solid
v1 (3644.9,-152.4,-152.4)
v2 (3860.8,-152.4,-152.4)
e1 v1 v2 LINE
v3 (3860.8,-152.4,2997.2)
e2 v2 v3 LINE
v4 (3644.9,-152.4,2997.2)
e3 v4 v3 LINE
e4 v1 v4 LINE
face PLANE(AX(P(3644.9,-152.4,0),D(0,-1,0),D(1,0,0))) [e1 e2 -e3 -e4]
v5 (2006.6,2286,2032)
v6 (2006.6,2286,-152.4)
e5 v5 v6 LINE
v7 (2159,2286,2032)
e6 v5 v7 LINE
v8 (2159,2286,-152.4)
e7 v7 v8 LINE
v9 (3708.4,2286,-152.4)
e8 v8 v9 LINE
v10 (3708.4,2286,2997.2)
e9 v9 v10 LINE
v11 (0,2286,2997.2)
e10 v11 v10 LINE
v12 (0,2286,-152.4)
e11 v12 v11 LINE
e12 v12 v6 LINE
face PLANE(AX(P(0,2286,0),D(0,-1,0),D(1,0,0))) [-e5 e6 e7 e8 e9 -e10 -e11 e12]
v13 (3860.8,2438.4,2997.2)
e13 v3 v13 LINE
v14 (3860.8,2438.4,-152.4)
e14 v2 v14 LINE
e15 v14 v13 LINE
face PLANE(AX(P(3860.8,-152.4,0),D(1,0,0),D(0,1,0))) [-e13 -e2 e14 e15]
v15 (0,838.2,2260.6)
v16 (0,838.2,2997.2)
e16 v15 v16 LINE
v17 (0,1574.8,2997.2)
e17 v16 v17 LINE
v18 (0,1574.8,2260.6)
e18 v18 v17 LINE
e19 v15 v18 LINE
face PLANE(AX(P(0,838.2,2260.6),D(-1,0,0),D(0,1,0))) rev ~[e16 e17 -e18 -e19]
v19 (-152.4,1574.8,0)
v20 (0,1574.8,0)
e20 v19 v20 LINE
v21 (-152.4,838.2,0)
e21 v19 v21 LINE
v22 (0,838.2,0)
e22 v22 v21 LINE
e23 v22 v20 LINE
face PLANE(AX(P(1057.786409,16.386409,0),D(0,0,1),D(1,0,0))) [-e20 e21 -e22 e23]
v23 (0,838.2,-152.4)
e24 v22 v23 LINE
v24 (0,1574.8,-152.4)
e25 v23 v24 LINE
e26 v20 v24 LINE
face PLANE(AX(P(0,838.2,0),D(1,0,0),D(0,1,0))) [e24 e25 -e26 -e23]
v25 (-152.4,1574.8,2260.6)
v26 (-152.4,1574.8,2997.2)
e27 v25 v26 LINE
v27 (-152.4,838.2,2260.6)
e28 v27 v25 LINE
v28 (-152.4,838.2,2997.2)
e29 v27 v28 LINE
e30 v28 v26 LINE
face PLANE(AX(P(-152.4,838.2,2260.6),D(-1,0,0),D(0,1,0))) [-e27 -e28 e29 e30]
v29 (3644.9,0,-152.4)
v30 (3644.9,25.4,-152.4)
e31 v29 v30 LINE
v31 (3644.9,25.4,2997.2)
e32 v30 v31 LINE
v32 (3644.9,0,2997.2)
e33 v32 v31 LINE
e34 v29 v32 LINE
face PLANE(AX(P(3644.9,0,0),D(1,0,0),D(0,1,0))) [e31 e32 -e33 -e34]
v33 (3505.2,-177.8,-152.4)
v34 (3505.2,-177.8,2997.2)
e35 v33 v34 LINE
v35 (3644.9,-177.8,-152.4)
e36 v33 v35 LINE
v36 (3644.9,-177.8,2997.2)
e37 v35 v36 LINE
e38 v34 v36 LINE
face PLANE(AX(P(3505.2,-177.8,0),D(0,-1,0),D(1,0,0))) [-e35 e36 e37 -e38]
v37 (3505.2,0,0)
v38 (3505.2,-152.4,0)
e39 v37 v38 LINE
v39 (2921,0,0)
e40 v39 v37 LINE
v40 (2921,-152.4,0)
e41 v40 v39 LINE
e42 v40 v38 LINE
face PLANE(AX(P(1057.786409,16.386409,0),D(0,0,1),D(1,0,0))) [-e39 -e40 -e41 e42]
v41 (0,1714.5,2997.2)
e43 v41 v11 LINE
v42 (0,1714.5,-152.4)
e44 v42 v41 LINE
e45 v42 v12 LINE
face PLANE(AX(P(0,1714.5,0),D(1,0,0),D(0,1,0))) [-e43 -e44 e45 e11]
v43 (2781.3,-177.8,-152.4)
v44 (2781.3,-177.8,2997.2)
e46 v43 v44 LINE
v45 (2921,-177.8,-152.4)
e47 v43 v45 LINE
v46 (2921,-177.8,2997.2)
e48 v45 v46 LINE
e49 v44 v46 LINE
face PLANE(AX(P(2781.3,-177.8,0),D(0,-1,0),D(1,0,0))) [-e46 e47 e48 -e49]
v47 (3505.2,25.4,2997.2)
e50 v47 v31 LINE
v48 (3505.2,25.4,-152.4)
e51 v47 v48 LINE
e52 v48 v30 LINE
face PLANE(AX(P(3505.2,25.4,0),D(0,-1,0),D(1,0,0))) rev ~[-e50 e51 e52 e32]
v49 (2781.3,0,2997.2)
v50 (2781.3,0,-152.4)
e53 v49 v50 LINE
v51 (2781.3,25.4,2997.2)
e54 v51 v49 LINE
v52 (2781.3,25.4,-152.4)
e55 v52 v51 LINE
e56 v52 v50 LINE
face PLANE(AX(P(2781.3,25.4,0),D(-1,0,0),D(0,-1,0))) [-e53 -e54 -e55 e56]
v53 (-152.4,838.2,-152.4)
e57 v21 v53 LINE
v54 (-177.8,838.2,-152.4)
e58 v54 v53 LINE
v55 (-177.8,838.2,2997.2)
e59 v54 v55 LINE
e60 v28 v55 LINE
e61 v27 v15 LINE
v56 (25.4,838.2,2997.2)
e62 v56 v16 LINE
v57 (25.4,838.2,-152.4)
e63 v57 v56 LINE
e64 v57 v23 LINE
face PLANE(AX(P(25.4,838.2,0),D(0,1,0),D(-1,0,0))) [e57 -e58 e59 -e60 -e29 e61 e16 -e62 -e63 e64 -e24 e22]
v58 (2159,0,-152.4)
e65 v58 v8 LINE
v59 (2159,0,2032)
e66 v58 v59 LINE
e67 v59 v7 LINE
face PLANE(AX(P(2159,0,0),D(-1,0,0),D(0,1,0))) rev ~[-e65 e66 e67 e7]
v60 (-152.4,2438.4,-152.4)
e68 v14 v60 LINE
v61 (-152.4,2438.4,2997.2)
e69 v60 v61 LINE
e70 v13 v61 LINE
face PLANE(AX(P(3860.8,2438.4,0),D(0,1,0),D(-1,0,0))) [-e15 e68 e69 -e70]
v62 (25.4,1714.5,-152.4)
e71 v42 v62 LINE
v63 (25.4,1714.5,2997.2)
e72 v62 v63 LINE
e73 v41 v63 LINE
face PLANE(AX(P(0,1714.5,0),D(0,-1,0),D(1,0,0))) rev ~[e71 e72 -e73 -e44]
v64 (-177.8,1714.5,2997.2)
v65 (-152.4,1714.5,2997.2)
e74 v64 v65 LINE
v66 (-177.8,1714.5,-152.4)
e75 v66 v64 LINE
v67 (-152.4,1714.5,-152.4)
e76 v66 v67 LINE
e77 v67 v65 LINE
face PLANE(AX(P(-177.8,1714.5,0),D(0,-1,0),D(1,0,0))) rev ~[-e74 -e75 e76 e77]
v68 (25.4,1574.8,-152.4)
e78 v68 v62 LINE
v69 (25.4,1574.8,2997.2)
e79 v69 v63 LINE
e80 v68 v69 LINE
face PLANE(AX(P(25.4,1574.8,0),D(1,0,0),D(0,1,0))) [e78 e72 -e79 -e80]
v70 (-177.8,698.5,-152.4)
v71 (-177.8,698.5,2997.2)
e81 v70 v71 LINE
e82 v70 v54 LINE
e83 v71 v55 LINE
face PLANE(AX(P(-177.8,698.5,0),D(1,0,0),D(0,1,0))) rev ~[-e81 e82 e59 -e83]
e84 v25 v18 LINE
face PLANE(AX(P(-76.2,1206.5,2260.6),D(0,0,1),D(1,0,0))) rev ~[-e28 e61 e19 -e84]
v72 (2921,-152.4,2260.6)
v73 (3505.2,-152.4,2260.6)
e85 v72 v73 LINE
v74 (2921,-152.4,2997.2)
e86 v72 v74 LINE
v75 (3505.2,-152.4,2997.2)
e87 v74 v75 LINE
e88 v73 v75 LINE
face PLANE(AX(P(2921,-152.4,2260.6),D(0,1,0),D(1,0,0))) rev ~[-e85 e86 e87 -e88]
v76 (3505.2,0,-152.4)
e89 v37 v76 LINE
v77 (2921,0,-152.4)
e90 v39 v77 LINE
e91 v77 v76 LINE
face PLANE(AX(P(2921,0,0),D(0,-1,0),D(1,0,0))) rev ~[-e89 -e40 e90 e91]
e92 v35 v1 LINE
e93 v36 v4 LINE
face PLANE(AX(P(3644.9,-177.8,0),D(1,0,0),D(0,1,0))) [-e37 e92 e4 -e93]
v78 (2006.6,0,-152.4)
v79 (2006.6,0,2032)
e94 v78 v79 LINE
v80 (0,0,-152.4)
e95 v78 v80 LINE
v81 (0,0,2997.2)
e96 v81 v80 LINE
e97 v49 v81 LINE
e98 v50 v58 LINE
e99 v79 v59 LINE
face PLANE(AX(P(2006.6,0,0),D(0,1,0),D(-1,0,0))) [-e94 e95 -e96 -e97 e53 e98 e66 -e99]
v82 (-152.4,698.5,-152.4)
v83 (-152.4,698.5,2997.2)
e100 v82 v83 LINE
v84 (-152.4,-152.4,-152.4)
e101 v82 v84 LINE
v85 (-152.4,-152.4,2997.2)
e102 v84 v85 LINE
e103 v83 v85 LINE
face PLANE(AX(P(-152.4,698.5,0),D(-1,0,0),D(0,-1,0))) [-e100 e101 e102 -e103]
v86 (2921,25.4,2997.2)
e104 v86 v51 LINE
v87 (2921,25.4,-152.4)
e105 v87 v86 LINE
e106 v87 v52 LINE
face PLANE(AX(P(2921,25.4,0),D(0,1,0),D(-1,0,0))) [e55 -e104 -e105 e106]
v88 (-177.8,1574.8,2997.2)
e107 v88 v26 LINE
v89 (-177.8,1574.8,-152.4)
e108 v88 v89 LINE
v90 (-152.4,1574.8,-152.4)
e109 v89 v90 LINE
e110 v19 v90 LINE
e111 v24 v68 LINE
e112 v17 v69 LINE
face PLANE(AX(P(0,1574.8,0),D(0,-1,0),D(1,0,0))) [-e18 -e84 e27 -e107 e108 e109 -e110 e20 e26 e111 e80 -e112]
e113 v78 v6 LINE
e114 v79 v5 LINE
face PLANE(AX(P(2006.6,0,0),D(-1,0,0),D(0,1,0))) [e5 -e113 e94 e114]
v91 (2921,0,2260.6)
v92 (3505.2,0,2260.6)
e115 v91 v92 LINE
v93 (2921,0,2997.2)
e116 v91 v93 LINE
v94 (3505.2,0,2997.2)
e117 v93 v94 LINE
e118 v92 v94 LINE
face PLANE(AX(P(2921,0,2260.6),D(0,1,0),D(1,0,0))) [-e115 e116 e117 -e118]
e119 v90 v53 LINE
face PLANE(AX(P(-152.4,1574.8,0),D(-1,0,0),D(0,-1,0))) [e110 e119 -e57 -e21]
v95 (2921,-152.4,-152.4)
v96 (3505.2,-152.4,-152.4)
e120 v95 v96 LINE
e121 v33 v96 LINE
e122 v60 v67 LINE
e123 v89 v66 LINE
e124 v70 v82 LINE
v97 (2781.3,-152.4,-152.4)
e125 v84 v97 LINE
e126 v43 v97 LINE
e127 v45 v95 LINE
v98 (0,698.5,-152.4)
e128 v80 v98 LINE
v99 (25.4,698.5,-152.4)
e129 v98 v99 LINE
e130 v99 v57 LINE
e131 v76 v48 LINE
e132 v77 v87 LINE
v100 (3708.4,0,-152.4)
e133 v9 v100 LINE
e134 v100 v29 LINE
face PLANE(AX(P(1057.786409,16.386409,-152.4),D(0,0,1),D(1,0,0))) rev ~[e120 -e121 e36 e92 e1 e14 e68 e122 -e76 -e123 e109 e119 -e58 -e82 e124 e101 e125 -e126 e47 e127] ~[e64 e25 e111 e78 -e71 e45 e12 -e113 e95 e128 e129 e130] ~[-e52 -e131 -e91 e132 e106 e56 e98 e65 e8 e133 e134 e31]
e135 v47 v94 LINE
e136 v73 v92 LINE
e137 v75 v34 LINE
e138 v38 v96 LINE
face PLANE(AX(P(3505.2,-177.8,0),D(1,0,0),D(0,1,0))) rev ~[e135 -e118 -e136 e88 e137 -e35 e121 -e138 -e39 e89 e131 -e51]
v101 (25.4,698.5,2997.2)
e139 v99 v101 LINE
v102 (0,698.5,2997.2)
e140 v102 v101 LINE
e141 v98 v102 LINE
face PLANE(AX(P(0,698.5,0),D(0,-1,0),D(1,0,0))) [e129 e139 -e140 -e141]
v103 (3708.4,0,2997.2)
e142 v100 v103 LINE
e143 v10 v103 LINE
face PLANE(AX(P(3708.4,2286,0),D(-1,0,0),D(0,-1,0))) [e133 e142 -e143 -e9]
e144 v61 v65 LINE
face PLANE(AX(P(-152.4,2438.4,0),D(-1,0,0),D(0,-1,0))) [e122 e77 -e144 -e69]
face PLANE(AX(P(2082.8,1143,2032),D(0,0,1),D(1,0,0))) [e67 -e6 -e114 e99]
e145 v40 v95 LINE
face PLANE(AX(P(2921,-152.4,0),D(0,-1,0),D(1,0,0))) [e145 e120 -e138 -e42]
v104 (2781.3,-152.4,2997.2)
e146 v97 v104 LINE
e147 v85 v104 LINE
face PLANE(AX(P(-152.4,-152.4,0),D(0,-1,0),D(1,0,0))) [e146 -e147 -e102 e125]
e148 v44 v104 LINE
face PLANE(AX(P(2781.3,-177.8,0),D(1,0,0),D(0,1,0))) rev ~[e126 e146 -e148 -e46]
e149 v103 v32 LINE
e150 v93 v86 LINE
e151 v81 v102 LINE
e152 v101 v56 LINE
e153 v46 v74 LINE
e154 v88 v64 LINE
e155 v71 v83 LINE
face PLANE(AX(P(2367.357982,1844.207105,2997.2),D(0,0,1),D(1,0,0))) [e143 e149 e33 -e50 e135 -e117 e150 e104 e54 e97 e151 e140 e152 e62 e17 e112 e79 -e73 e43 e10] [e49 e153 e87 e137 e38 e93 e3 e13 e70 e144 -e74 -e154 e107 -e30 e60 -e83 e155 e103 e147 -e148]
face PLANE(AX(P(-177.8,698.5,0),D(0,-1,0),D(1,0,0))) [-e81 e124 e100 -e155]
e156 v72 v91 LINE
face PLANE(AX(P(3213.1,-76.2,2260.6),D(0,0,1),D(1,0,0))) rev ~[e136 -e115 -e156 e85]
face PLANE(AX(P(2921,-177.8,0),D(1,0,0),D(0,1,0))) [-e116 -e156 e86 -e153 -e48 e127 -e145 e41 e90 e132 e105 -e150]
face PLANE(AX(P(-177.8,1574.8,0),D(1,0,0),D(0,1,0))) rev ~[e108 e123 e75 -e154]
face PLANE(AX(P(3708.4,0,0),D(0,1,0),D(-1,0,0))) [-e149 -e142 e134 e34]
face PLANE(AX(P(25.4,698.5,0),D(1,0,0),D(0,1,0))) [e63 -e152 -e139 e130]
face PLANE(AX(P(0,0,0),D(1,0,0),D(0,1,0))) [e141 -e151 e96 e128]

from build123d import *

# Parameters (mm, degrees)
F0_W     = 152.4
F0_H     = 139.7
F0_W_2   = 25.4
F0_W_3   = 139.7
F0_H_2   = 152.4
F0_H_3   = 25.4
F1_DEPTH = 2997.2
F2_START = 2260.6
F0_H_4   = 736.6
F0_W_4   = 584.2
F2_DEPTH = 736.6
F0_H_5   = 2286
F3_DEPTH = 152.4
F4_DEPTH = 2032


with BuildPart() as f1:
    # F0 (on Top) → F1 (new body)
    with BuildSketch(Plane.XY):
        Polygon((2006.6, 0), (0, 0), (0, 698.5), (-152.4, 698.5), (-152.4, -152.4), (2781.3, -152.4), (2781.3, 0), (2159, 0), align=None)
        with Locations((-76.2, 768.35)):
            Rectangle(F0_W, F0_H)
        with Locations((12.7, 768.35)):
            Rectangle(F0_W_2, F0_H)
        with Locations((-165.1, 768.35)):
            Rectangle(F0_W_2, F0_H)
        Polygon((2781.3, 25.4), (2781.3, 0), (2921, 0), (2921, 25.4), (2844.8, 25.4), align=None)
        with Locations((2851.15, -76.2)):
            Rectangle(F0_W_3, F0_H_2)
        with Locations((2851.15, -165.1)):
            Rectangle(F0_W_3, F0_H_3)
    extrude(amount=F1_DEPTH)



with BuildPart() as f1b:
    # F0 (on Top) → F1, piece 2 (new body)
    with BuildSketch(Plane.XY):
        Polygon((0, 2286), (2006.6, 2286), (2159, 2286), (3708.4, 2286), (3708.4, 0), (3644.9, 0), (3644.9, -152.4), (3860.8, -152.4), (3860.8, 2438.4), (-152.4, 2438.4), (-152.4, 1714.5), (0, 1714.5), align=None)
        with Locations((-76.2, 1644.65)):
            Rectangle(F0_W, F0_H)
        with Locations((12.7, 1644.65)):
            Rectangle(F0_W_2, F0_H)
        with Locations((-165.1, 1644.65)):
            Rectangle(F0_W_2, F0_H)
        with Locations((3575.05, 12.7)):
            Rectangle(F0_W_3, F0_H_3)
        with Locations((3575.05, -76.2)):
            Rectangle(F0_W_3, F0_H_2)
        with Locations((3575.05, -165.1)):
            Rectangle(F0_W_3, F0_H_3)
    extrude(amount=F1_DEPTH)


with BuildPart() as f1_1:
    add(f1.part)

    add(f1b.part)  # F2 merges F1b
    # F0 (on Top) → F2 (join)
    with BuildSketch(Plane.XY.offset(F2_START)):
        with Locations((-76.2, 1206.5)):
            Rectangle(F0_W, F0_H_4)
        with Locations((3213.1, -76.2)):
            Rectangle(F0_W_4, F0_H_2)
    extrude(amount=F2_DEPTH)

    # F0 (on Top) → F3 (join)
    with BuildSketch(Plane.XY):
        Polygon((2006.6, 0), (0, 0), (0, 698.5), (-152.4, 698.5), (-152.4, -152.4), (2781.3, -152.4), (2781.3, 0), (2159, 0), align=None)
        with Locations((2082.8, 1143)):
            Rectangle(F0_W, F0_H_5)
        with Locations((-76.2, 768.35)):
            Rectangle(F0_W, F0_H)
        with Locations((12.7, 768.35)):
            Rectangle(F0_W_2, F0_H)
        Polygon((0, 2286), (2006.6, 2286), (2159, 2286), (3708.4, 2286), (3708.4, 0), (3644.9, 0), (3644.9, -152.4), (3860.8, -152.4), (3860.8, 2438.4), (-152.4, 2438.4), (-152.4, 1714.5), (0, 1714.5), align=None)
        with Locations((-76.2, 1206.5)):
            Rectangle(F0_W, F0_H_4)
        with Locations((-165.1, 768.35)):
            Rectangle(F0_W_2, F0_H)
        Polygon((2781.3, 25.4), (2781.3, 0), (2921, 0), (2921, 25.4), (2844.8, 25.4), align=None)
        with Locations((2851.15, -76.2)):
            Rectangle(F0_W_3, F0_H_2)
        with Locations((-76.2, 1644.65)):
            Rectangle(F0_W, F0_H)
        with Locations((12.7, 1644.65)):
            Rectangle(F0_W_2, F0_H)
        with Locations((3213.1, -76.2)):
            Rectangle(F0_W_4, F0_H_2)
        with Locations((2851.15, -165.1)):
            Rectangle(F0_W_3, F0_H_3)
        with Locations((-165.1, 1644.65)):
            Rectangle(F0_W_2, F0_H)
        with Locations((3575.05, 12.7)):
            Rectangle(F0_W_3, F0_H_3)
        with Locations((3575.05, -76.2)):
            Rectangle(F0_W_3, F0_H_2)
        with Locations((3575.05, -165.1)):
            Rectangle(F0_W_3, F0_H_3)
    extrude(amount=-F3_DEPTH)

    # F0 (on Top) → F4 (join)
    with BuildSketch(Plane.XY):
        with Locations((2082.8, 1143)):
            Rectangle(F0_W, F0_H_5)
    extrude(amount=F4_DEPTH)


solid = f1_1.part
